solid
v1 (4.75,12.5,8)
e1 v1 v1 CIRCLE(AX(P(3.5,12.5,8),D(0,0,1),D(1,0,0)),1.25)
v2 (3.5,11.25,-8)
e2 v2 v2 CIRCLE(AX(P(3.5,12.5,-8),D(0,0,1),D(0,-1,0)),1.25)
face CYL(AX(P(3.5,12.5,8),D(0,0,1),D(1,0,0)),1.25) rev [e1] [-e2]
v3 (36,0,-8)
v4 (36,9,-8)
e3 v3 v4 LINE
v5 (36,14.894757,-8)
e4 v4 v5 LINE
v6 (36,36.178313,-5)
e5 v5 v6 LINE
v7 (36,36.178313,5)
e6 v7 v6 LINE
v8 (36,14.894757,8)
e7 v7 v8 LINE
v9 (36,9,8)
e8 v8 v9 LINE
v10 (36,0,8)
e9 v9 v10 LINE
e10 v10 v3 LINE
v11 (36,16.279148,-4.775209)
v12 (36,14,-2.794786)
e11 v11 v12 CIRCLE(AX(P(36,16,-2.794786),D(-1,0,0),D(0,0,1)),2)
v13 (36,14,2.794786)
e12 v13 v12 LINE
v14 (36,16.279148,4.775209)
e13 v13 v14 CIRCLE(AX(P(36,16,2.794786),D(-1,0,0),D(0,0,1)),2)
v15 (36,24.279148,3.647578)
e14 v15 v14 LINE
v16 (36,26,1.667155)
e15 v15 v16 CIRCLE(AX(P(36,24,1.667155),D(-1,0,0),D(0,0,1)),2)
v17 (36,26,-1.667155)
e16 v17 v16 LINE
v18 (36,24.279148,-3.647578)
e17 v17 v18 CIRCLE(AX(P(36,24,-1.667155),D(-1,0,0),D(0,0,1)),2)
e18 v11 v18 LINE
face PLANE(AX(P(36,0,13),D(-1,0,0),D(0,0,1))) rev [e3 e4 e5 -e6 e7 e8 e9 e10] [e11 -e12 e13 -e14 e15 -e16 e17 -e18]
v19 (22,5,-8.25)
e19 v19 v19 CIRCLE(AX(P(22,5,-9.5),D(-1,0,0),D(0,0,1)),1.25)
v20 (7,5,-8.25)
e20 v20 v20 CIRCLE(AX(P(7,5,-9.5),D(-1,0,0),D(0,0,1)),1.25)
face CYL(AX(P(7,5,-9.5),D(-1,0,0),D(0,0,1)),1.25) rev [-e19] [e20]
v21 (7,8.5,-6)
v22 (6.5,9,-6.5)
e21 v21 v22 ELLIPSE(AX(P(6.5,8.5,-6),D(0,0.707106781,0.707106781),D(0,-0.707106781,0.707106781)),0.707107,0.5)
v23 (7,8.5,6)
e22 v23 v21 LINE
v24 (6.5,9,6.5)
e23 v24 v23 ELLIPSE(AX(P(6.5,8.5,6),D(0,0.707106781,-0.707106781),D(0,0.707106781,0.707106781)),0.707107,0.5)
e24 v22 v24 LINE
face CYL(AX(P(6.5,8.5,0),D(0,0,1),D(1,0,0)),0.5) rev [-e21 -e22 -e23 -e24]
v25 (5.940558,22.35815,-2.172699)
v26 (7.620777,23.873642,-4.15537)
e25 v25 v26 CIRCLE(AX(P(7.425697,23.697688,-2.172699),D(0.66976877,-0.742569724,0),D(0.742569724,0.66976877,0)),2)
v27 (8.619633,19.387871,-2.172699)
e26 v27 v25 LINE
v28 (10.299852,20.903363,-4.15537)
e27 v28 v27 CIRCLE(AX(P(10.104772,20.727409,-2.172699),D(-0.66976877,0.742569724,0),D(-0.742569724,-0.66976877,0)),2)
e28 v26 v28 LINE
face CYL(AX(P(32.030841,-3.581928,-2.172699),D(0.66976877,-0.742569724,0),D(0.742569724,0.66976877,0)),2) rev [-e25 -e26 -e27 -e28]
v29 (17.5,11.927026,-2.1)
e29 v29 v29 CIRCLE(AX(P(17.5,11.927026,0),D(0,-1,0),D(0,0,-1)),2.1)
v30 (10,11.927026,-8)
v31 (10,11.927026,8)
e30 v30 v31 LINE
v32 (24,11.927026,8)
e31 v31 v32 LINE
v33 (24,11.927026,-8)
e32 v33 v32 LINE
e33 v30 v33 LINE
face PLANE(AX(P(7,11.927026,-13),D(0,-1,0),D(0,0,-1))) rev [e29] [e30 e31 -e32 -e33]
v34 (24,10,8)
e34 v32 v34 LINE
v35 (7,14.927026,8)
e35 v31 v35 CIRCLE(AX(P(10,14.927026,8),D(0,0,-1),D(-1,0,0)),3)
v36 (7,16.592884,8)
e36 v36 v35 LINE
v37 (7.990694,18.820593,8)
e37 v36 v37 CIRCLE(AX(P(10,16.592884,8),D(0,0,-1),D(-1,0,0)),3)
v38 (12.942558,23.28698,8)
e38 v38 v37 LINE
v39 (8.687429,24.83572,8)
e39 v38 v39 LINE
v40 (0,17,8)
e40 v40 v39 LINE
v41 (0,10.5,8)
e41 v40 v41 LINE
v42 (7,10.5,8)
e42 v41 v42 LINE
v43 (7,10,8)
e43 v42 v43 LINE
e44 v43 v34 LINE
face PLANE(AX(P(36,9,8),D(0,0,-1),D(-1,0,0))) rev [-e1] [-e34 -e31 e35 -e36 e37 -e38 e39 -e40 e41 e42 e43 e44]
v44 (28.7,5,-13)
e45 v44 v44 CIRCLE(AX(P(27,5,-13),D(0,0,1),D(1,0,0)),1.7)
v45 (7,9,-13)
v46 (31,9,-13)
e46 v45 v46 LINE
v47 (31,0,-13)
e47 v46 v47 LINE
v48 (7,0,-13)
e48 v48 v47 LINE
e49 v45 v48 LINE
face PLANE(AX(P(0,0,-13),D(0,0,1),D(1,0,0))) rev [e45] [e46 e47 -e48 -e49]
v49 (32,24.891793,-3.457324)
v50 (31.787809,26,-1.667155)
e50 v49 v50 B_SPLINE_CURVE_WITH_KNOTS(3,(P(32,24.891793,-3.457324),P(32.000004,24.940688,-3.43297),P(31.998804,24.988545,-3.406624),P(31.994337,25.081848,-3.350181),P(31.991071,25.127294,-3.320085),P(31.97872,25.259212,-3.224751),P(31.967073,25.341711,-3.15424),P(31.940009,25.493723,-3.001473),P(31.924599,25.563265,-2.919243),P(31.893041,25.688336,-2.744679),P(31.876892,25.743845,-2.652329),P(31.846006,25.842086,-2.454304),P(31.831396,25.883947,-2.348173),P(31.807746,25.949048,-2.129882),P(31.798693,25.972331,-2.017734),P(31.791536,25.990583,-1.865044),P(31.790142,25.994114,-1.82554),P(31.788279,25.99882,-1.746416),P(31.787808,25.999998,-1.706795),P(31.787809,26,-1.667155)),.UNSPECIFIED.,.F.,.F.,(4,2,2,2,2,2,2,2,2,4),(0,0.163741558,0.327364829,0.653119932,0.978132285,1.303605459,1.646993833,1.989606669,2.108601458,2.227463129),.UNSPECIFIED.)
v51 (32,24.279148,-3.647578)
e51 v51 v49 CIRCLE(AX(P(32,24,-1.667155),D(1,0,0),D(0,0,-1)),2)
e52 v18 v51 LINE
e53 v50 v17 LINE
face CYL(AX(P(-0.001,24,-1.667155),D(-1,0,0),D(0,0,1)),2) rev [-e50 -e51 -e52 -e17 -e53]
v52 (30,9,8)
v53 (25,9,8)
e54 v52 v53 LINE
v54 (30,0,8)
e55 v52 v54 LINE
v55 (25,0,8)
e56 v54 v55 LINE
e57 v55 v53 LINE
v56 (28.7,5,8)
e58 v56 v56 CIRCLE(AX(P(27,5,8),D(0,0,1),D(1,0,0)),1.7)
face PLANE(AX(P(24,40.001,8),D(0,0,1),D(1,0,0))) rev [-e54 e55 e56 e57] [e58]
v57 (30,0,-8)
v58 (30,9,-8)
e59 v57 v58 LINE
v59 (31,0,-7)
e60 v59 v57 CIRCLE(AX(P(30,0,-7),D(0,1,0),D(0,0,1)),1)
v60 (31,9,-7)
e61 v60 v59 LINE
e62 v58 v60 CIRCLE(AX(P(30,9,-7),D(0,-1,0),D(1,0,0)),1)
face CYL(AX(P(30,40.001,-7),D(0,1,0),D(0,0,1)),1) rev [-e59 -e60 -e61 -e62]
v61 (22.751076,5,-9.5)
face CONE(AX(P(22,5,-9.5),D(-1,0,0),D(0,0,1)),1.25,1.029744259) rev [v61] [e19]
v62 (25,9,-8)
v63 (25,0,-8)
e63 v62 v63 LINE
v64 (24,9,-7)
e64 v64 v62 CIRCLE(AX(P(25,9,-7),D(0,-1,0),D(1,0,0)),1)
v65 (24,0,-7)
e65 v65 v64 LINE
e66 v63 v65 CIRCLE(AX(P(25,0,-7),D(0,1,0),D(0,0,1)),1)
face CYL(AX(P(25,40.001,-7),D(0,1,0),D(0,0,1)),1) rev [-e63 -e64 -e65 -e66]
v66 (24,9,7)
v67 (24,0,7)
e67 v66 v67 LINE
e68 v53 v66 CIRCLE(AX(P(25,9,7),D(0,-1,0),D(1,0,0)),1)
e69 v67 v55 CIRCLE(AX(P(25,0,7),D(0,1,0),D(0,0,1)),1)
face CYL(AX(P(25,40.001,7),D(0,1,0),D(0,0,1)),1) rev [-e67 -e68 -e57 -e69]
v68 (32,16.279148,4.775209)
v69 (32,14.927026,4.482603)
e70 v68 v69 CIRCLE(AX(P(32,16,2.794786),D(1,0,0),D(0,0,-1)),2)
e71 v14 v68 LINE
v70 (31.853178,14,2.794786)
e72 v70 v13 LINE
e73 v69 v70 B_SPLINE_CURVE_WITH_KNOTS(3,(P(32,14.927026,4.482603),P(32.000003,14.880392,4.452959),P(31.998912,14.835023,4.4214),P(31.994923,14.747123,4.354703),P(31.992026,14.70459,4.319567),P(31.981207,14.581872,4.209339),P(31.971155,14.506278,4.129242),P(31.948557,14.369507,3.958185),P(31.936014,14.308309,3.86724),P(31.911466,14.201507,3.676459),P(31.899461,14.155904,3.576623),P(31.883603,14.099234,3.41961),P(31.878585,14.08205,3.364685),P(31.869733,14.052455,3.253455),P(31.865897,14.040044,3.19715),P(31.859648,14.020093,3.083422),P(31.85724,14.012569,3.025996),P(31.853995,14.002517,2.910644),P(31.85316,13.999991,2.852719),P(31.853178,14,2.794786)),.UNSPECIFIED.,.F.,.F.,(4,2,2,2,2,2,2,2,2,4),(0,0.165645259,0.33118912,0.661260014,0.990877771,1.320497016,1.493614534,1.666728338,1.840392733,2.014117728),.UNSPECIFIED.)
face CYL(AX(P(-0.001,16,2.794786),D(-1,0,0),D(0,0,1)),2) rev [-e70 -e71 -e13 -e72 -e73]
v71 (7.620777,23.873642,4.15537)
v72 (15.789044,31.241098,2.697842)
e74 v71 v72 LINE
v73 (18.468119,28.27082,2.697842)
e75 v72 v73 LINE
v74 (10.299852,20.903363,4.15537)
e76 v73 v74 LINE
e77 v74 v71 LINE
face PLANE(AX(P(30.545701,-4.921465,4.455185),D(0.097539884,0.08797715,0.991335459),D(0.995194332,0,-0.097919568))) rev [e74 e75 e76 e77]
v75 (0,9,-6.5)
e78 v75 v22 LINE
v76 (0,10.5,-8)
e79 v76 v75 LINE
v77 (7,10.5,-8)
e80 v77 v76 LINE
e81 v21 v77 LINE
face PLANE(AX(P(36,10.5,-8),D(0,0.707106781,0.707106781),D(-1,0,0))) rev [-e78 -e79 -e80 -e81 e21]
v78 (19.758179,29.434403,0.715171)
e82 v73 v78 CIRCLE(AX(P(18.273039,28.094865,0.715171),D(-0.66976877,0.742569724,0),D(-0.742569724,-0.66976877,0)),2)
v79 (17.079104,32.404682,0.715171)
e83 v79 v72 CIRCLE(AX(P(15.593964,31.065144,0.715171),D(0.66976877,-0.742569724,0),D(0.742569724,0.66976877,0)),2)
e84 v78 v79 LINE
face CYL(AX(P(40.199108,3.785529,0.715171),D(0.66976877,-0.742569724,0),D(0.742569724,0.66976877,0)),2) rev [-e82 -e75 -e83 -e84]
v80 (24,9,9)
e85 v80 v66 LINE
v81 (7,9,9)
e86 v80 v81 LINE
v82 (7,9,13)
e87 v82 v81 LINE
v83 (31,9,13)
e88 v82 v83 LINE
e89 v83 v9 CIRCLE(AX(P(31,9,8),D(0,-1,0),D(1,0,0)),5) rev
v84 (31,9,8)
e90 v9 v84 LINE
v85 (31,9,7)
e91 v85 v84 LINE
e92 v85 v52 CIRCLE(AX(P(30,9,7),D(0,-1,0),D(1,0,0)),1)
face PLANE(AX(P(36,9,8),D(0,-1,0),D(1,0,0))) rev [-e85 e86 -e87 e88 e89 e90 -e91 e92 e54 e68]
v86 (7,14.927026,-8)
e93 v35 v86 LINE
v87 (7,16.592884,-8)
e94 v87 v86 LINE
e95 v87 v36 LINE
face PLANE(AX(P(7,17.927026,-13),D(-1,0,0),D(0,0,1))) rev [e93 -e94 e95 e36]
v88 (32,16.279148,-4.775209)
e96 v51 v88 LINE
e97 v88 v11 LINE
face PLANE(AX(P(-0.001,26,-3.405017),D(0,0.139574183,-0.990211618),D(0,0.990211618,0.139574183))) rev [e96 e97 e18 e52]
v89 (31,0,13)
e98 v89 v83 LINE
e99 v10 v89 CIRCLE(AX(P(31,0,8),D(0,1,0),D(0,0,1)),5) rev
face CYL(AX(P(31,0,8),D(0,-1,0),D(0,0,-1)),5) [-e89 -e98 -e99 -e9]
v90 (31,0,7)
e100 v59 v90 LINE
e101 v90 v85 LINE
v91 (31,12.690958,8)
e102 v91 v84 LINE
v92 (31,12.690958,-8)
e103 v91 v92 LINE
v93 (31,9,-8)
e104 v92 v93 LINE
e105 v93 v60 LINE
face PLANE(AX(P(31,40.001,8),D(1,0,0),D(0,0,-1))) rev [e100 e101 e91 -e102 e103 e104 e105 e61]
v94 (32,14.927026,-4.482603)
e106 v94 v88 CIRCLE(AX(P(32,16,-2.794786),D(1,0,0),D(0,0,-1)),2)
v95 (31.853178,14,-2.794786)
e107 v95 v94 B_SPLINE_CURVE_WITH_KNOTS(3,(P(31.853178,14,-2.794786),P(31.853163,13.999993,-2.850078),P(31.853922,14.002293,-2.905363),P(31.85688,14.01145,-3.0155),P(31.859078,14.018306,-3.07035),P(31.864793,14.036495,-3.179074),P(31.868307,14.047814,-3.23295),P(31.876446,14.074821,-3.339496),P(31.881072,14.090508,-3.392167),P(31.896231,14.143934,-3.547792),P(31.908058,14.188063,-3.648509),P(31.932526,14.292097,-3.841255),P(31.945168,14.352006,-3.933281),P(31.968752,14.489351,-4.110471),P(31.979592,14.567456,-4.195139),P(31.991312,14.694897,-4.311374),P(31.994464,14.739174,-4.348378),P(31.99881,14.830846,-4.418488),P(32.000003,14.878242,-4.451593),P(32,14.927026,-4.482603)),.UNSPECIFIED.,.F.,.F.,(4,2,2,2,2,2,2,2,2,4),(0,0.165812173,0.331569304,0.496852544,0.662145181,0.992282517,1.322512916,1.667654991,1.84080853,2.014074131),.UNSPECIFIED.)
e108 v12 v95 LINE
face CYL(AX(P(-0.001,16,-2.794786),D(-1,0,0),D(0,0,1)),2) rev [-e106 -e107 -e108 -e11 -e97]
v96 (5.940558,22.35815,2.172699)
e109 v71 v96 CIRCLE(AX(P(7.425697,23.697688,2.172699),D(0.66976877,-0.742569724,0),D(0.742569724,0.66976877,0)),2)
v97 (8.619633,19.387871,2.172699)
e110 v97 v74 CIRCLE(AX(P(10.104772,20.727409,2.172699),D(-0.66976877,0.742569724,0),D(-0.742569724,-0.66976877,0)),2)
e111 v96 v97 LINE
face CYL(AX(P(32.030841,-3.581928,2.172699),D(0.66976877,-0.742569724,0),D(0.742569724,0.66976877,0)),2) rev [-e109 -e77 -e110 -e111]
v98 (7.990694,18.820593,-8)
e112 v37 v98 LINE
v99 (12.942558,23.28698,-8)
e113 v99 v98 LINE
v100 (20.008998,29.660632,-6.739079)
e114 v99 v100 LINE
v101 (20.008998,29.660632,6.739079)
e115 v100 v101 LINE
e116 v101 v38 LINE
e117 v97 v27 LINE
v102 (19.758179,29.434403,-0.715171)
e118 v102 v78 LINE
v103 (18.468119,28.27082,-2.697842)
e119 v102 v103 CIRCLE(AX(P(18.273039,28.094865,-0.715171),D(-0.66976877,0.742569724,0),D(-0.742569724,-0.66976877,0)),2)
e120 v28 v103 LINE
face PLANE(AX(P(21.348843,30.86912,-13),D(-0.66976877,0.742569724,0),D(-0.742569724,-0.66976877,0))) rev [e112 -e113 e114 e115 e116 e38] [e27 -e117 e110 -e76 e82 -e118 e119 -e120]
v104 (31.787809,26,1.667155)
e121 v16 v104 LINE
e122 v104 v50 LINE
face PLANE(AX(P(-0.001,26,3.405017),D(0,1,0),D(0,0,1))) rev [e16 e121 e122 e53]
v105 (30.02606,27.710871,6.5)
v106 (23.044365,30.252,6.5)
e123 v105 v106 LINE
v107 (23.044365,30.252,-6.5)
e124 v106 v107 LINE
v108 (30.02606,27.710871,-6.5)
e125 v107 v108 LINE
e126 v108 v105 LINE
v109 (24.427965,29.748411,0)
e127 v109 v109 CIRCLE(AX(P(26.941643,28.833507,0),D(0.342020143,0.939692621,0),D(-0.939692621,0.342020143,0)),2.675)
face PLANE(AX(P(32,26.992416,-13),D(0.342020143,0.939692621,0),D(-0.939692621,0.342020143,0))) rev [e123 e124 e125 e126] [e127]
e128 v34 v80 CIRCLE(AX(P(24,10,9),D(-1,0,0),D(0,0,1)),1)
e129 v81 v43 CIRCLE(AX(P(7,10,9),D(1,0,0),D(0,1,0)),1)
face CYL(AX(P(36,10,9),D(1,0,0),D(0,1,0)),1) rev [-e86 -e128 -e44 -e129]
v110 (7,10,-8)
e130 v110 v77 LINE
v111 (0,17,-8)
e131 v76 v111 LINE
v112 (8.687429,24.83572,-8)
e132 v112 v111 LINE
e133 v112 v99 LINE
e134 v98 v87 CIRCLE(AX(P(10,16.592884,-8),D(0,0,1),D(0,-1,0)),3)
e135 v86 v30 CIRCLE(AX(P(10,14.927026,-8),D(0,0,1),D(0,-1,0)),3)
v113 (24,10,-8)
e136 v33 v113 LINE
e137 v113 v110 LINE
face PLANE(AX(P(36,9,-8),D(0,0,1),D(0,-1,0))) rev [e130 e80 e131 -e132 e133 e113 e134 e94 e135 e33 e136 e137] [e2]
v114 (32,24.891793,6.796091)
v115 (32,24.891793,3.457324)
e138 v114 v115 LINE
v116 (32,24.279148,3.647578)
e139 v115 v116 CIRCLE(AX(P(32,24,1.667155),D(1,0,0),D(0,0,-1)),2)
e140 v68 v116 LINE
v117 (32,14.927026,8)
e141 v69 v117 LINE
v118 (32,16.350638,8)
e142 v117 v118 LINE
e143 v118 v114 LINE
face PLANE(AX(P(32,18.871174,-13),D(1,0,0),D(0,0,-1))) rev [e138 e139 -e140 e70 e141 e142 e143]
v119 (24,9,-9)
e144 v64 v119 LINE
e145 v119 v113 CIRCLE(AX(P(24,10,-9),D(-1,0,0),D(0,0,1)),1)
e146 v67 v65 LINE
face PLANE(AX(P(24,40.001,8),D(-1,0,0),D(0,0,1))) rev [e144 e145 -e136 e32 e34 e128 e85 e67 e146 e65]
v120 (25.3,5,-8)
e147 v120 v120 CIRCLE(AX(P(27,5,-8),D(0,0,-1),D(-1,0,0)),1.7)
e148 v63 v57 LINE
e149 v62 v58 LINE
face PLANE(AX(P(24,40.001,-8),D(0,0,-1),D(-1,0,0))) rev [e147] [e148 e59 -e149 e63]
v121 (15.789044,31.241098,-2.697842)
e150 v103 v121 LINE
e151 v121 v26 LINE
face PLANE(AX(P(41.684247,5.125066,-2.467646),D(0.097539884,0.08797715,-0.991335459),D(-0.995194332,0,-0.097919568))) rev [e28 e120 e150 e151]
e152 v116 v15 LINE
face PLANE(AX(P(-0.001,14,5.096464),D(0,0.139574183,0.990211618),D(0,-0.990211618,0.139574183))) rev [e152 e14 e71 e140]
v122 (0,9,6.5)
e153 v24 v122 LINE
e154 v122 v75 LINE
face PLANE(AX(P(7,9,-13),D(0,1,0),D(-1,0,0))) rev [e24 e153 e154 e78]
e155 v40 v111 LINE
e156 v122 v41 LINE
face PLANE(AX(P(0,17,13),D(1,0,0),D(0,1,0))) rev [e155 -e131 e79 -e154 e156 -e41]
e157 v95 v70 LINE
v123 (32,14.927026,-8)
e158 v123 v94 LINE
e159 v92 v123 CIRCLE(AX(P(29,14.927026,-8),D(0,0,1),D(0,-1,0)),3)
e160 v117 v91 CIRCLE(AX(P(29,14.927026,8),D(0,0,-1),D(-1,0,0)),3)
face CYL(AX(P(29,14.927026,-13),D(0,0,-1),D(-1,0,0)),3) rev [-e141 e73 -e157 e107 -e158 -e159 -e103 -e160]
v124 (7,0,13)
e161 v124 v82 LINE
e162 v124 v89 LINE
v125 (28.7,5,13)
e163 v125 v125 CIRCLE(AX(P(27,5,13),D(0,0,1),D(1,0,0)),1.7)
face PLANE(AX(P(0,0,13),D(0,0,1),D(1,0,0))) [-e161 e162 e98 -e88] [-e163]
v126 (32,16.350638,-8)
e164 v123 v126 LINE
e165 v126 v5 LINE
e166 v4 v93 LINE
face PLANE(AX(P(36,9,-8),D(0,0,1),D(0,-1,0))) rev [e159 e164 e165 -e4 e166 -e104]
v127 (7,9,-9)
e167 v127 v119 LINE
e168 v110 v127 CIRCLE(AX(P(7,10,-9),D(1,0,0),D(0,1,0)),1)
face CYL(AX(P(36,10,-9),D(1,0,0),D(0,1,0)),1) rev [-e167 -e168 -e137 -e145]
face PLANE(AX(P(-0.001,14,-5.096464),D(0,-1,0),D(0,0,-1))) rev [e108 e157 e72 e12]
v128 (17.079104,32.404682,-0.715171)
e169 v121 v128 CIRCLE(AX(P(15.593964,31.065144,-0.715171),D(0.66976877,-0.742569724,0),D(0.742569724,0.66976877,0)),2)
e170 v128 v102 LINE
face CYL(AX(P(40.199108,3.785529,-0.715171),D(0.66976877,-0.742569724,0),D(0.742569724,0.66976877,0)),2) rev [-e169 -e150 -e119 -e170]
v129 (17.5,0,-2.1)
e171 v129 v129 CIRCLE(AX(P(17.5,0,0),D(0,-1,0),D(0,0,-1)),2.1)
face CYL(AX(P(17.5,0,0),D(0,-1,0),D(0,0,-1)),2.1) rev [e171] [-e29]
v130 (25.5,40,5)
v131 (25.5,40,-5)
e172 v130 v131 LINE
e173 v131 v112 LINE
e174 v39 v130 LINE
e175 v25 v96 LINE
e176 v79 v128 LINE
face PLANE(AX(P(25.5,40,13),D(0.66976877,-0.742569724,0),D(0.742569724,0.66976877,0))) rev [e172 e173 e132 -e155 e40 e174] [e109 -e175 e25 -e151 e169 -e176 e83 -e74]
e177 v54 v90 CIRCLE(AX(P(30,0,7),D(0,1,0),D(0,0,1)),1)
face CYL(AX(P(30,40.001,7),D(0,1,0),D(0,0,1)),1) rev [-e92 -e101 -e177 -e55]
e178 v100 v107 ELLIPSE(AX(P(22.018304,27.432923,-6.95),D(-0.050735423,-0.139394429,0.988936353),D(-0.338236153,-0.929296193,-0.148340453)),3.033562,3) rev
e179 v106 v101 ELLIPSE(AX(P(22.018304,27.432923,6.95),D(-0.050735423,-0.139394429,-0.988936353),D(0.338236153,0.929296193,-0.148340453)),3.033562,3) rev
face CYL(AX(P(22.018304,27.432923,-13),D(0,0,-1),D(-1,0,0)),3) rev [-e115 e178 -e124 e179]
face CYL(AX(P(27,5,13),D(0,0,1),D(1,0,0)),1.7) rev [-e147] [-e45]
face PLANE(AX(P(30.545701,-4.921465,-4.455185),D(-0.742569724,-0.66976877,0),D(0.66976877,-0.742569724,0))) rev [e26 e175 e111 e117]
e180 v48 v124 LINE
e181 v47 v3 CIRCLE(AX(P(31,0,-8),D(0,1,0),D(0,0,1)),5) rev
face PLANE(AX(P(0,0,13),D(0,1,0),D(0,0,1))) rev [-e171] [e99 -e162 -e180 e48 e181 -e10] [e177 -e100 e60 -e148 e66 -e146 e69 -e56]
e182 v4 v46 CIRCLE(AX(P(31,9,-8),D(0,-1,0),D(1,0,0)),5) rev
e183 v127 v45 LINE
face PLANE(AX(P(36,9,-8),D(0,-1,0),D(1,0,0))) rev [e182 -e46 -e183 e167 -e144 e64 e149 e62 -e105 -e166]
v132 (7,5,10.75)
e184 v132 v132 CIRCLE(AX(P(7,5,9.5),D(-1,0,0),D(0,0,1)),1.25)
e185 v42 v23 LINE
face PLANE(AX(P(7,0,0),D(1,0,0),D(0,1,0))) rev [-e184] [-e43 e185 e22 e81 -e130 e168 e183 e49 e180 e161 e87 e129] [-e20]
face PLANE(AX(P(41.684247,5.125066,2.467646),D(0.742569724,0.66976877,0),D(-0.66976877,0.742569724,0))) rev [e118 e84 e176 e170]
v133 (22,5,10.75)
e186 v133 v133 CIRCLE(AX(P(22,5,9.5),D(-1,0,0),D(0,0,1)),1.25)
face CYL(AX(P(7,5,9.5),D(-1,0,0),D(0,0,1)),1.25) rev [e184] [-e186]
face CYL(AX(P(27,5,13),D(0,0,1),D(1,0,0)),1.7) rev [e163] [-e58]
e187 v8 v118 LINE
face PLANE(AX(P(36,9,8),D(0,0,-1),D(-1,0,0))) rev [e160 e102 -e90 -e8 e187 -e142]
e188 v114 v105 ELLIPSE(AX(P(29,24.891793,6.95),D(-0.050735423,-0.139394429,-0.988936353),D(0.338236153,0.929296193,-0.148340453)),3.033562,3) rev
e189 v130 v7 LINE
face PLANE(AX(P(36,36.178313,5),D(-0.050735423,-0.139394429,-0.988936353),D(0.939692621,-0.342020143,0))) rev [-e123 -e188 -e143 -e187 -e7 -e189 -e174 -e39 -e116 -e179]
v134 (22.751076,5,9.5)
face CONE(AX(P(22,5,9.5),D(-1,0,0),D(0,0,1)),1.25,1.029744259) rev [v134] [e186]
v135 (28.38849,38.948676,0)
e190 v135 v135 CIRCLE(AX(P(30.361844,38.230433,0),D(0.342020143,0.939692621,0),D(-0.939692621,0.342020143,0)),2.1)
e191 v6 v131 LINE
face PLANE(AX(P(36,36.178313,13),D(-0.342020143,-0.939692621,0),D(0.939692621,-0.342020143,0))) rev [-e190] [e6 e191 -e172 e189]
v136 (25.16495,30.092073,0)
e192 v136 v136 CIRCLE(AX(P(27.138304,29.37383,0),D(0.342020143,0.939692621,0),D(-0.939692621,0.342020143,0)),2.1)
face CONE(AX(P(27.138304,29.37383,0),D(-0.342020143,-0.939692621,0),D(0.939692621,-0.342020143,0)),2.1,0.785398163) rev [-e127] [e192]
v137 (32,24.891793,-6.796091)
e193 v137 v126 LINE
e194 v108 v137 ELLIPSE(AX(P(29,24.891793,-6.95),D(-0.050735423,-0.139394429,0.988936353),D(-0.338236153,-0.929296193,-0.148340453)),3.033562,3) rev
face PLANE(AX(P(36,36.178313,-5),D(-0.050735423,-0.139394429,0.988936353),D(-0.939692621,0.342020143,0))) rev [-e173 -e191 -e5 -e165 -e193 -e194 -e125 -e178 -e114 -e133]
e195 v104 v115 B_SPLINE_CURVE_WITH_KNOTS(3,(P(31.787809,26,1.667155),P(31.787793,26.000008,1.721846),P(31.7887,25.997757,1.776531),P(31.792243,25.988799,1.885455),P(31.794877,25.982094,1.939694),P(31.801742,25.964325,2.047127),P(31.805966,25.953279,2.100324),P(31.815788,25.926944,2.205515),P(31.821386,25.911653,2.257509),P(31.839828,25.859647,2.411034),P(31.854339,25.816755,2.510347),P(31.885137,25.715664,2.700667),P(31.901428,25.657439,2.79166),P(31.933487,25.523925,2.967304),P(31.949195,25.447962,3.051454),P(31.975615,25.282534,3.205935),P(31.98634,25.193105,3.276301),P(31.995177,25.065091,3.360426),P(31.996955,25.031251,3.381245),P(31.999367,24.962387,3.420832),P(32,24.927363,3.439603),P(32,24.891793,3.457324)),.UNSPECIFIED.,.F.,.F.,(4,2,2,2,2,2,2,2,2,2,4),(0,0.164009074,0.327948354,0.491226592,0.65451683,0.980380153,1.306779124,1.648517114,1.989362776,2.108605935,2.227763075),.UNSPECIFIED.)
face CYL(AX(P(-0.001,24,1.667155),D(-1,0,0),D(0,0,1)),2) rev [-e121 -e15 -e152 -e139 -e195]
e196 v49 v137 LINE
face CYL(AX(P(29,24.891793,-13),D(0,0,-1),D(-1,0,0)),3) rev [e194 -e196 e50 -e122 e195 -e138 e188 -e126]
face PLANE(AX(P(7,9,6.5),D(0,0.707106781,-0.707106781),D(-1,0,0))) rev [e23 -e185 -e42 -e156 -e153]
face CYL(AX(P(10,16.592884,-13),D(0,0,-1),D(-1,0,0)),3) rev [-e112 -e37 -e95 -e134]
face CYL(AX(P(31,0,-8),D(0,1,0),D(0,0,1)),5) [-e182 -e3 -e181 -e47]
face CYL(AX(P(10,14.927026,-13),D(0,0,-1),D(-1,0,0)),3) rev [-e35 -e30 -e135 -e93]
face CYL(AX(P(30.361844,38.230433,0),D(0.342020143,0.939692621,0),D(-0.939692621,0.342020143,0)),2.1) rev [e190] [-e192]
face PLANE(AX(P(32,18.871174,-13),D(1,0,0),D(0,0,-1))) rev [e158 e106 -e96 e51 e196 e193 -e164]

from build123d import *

# Parameters (mm, degrees)
BOSS_EXTRUDE1_DEPTH       = 13
SKETCH2_W                 = 26
SKETCH2_H                 = 9
CUT_EXTRUDE1_DEPTH        = 7
SKETCH3_W                 = 5.460158558
SKETCH3_H                 = 35.727642342
SKETCH3_W_2               = 6.990786849
SKETCH3_H_2               = 37.804269356
CUT_EXTRUDE2_DEPTH        = 56.362442143
M3X0_5_TAPPED_HOLE2_D     = 2.5
M3X0_5_TAPPED_HOLE2_DEPTH = 15
M3X0_5_TAPPED_HOLE2_TIP   = 0.751075774
M3X0_5_TAPPED_HOLE1_D     = 2.5
M3_CLEARANCE_HOLE1_D      = 3.4
CUT_EXTRUDE3_DEPTH        = 58.766772456
FILLET2_R                 = 3
CHAMFER1_SIZE             = 20
CHAMFER1_SIZE_2           = 3
CUT_EXTRUDE4_REACH        = 57.362
FILLET3_R                 = 2
CUT_EXTRUDE5_REACH        = 57.527
FILLET4_R                 = 2
M5X0_8_TAPPED_HOLE1_D     = 4.2
M5X0_8_TAPPED_HOLE1_DEPTH = 11.927025935
FILLET6_R                 = 5
CUT_EXTRUDE6_REACH        = 57.362
SKETCH19_W                = 7
SKETCH19_H                = 16
FILLET7_R                 = 1
CHAMFER2_SIZE             = 1.5
FILLET8_R                 = 0.5
FILLET9_R                 = 1


with BuildPart() as part:
    # Sketch1 → Boss-Extrude1 (new, symmetric)
    with BuildSketch(Plane.XY):
        Polygon((0, 0), (36, 0), (36, 36.17831254), (25.5, 40), (0, 17), align=None)
    extrude(amount=BOSS_EXTRUDE1_DEPTH, both=True)

    # Sketch2 → Cut-Extrude1 (cut)
    with BuildSketch(Plane.ZY):
        with Locations((0, 4.5)):
            Rectangle(SKETCH2_W, SKETCH2_H)
    extrude(amount=-CUT_EXTRUDE1_DEPTH, mode=Mode.SUBTRACT)

    # Sketch3 → Cut-Extrude2 (cut, through all)
    with BuildSketch(Plane.ZY):
        with Locations((10.730079279, 26.863821171)):
            Rectangle(SKETCH3_W, SKETCH3_H)
        with Locations((-11.495393425, 27.902134678)):
            Rectangle(SKETCH3_W_2, SKETCH3_H_2)
    extrude(amount=-CUT_EXTRUDE2_DEPTH, mode=Mode.SUBTRACT)

    # M3x0.5 Tapped Hole2
    with Locations(Plane(origin=(7, 5, -9.5), x_dir=(0, -1, 0), z_dir=(-1, 0, 0))):
        with Locations((0, 0), (0, 19)):
            Hole(M3X0_5_TAPPED_HOLE2_D / 2, depth=M3X0_5_TAPPED_HOLE2_DEPTH)
            with Locations((0, 0, -(M3X0_5_TAPPED_HOLE2_DEPTH + M3X0_5_TAPPED_HOLE2_TIP / 2))):  # 118° drill point
                Cone(0, M3X0_5_TAPPED_HOLE2_D / 2, M3X0_5_TAPPED_HOLE2_TIP, mode=Mode.SUBTRACT)

    # M3x0.5 Tapped Hole1 (through all)
    with Locations(Plane(origin=(3.5, 12.5, 8), x_dir=(1, 0, 0), z_dir=(0, 0, 1))):
        with Locations((0, 0)):
            Hole(M3X0_5_TAPPED_HOLE1_D / 2)

    # M3 Clearance Hole1 (through all)
    with Locations(Plane.XY.offset(13)):
        with Locations((27, 5)):
            Hole(M3_CLEARANCE_HOLE1_D / 2)

    # Sketch13 → Cut-Extrude3 (cut, through all)
    with BuildSketch(Plane.XY.offset(8)):
        Polygon((32, 18.871173631), (32, 26.992415753), (21.34884319, 30.869119792), (7, 17.927025935), (7, 11.927025935), (32, 11.927025935), align=None)
    extrude(amount=-CUT_EXTRUDE3_DEPTH, mode=Mode.SUBTRACT)

    # Fillet2
    fillet2_edges = [part.edges().sort_by_distance(p)[0] for p in [
        (7, 11.927025935, 0),
        (7, 17.927025935, 0),
        (21.34884319, 30.869119792, 0),
        (32, 26.992415753, 0),
        (32, 11.927025935, 0),
    ]]
    fillet(fillet2_edges, radius=FILLET2_R)

    # Chamfer1
    # the kernel refuses this chamfer: 20, 3 mm, written as the material it takes off along each edge
    with BuildSketch(Plane(origin=(84.844019059, 18.400543481, 8), x_dir=(-0.3420145720677014, -0.939677313880462, 0.005707737883485923), z_dir=(-0.9396926207859104, 0.3420201433256634, 0))) as chamfer1_piece_1:
        Polygon((CHAMFER1_SIZE * 0.999983710731, -CHAMFER1_SIZE * 0.00570773788349), (-CHAMFER1_SIZE_2 * 0.00570773788349, -CHAMFER1_SIZE_2 * 0.999983710731), (0, 0), align=None)
    extrude(amount=115.131305413, mode=Mode.SUBTRACT)
    with BuildSketch(Plane(origin=(84.844019059, 18.400543481, -8), x_dir=(0.08410022637244834, 0.23106347292932808, 0.9692970769593502), z_dir=(-0.9396926207859104, 0.3420201433256634, 0))) as chamfer1_piece_2:
        Polygon((CHAMFER1_SIZE_2 * 0.969297076959, -CHAMFER1_SIZE_2 * 0.245892611922), (-CHAMFER1_SIZE * 0.245892611922, -CHAMFER1_SIZE * 0.969297076959), (0, 0), align=None)
    extrude(amount=115.131305413, mode=Mode.SUBTRACT)

    # Sketch14 → Cut-Extrude4 (cut, up to next)
    with BuildSketch(Plane(origin=(36, 0, 0), x_dir=(0, 0, -1), z_dir=(1, 0, 0)), mode=Mode.PRIVATE) as cut_extrude4_sk1:
        Polygon((-3.405017352, 26), (3.405017352, 26), (5.096464069, 14), (-5.096464069, 14), align=None)
    cut_extrude4_tool1 = extrude(cut_extrude4_sk1.sketch, amount=-CUT_EXTRUDE4_REACH, mode=Mode.PRIVATE) & part.part
    add(cut_extrude4_tool1.solids().sort_by_distance((36, 19.602082, 0))[0], mode=Mode.SUBTRACT)

    # Fillet3
    fillet3_edges = [part.edges().sort_by_distance(p)[0] for p in [
        (33.926588844, 14, -5.096464069),
        (33.926588844, 14, 5.096464069),
        (33.893904368, 26, -3.405017352),
        (33.893904368, 26, 3.405017352),
    ]]
    fillet(fillet3_edges, radius=FILLET3_R)

    # Sketch16 → Cut-Extrude5 (cut, up to next)
    with BuildSketch(Plane(origin=(-8.45495018, 9.373966504, 0), x_dir=(0.7425697235686507, 0.669768770277607, 0), z_dir=(-0.669768770277607, 0.7425697235686507, 0)), mode=Mode.PRIVATE) as cut_extrude5_sk1:
        Polygon((19.386069095, 4.455184815), (19.386069095, -4.455184815), (34.386069095, -2.467646022), (34.386069095, 2.467646022), align=None)
    cut_extrude5_tool1 = extrude(cut_extrude5_sk1.sketch, amount=-CUT_EXTRUDE5_REACH, mode=Mode.PRIVATE) & part.part
    add(cut_extrude5_tool1.solids().sort_by_distance((10.976853, 26.900691, 0))[0], mode=Mode.SUBTRACT)

    # Fillet4
    fillet4_edges = [part.edges().sort_by_distance(p)[0] for p in [
        (7.280095329, 20.873010715, -4.455184815),
        (18.418641183, 30.919542269, -2.467646022),
        (18.418641183, 30.919542269, 2.467646022),
        (7.280095329, 20.873010715, 4.455184815),
    ]]
    fillet(fillet4_edges, radius=FILLET4_R)

    # M5x0.8 Tapped Hole1
    with Locations(Plane(origin=(0, 0, 0), x_dir=(-1, 0, 0), z_dir=(0, -1, 0))):
        with Locations((-17.5, 0)):
            Hole(M5X0_8_TAPPED_HOLE1_D / 2, depth=M5X0_8_TAPPED_HOLE1_DEPTH)

    # Fillet6
    fillet6_edges = [part.edges().sort_by_distance(p)[0] for p in [
        (36, 4.5, 13),
        (36, 4.5, -13),
    ]]
    fillet(fillet6_edges, radius=FILLET6_R)

    # Sketch19 → Cut-Extrude6 (cut, up to next)
    with BuildSketch(Plane.XZ, mode=Mode.PRIVATE) as cut_extrude6_sk1:
        with Locations((27.5, 0)):
            Rectangle(SKETCH19_W, SKETCH19_H)
    cut_extrude6_tool1 = extrude(cut_extrude6_sk1.sketch, amount=-CUT_EXTRUDE6_REACH, mode=Mode.PRIVATE) & part.part
    add(cut_extrude6_tool1.solids().sort_by_distance((27.5, 0, 0))[0], mode=Mode.SUBTRACT)

    # Fillet7
    fillet7_edges = [part.edges().sort_by_distance(p)[0] for p in [
        (24, 4.5, 8),
        (31, 4.5, -8),
        (24, 4.5, -8),
        (31, 4.5, 8),
    ]]
    fillet(fillet7_edges, radius=FILLET7_R)

    # Sketch21 → M5x0.8 Tapped Hole2 (revolve, cut)
    with BuildSketch(Plane(origin=(30.361844275, 38.2304334, 0), x_dir=(-0.9396926207859102, 0.3420201433256637, 0), z_dir=(0, 0, 1))):
        Polygon((0, 0), (0, 10), (2.675, 10), (2.1, 9.425), (2.1, 0), align=None)
    revolve(axis=Axis((32.533672185, 44.197481542, 0), (-0.3420201433256637, -0.9396926207859103, 0)), mode=Mode.SUBTRACT)

    # Chamfer2
    chamfer2_edges = [part.edges().sort_by_distance(p)[0] for p in [
        (3.5, 9, 8),
        (3.5, 9, -8),
    ]]
    chamfer(chamfer2_edges, length=CHAMFER2_SIZE)

    # Fillet8
    fillet8_edges = [part.edges().sort_by_distance(p)[0] for p in [
        (7, 9, 0),
    ]]
    fillet(fillet8_edges, radius=FILLET8_R)

    # Fillet9
    fillet9_edges = [part.edges().sort_by_distance(p)[0] for p in [
        (15.5, 9, 8),
        (15.5, 9, -8),
    ]]
    fillet(fillet9_edges, radius=FILLET9_R)


solid = part.part
